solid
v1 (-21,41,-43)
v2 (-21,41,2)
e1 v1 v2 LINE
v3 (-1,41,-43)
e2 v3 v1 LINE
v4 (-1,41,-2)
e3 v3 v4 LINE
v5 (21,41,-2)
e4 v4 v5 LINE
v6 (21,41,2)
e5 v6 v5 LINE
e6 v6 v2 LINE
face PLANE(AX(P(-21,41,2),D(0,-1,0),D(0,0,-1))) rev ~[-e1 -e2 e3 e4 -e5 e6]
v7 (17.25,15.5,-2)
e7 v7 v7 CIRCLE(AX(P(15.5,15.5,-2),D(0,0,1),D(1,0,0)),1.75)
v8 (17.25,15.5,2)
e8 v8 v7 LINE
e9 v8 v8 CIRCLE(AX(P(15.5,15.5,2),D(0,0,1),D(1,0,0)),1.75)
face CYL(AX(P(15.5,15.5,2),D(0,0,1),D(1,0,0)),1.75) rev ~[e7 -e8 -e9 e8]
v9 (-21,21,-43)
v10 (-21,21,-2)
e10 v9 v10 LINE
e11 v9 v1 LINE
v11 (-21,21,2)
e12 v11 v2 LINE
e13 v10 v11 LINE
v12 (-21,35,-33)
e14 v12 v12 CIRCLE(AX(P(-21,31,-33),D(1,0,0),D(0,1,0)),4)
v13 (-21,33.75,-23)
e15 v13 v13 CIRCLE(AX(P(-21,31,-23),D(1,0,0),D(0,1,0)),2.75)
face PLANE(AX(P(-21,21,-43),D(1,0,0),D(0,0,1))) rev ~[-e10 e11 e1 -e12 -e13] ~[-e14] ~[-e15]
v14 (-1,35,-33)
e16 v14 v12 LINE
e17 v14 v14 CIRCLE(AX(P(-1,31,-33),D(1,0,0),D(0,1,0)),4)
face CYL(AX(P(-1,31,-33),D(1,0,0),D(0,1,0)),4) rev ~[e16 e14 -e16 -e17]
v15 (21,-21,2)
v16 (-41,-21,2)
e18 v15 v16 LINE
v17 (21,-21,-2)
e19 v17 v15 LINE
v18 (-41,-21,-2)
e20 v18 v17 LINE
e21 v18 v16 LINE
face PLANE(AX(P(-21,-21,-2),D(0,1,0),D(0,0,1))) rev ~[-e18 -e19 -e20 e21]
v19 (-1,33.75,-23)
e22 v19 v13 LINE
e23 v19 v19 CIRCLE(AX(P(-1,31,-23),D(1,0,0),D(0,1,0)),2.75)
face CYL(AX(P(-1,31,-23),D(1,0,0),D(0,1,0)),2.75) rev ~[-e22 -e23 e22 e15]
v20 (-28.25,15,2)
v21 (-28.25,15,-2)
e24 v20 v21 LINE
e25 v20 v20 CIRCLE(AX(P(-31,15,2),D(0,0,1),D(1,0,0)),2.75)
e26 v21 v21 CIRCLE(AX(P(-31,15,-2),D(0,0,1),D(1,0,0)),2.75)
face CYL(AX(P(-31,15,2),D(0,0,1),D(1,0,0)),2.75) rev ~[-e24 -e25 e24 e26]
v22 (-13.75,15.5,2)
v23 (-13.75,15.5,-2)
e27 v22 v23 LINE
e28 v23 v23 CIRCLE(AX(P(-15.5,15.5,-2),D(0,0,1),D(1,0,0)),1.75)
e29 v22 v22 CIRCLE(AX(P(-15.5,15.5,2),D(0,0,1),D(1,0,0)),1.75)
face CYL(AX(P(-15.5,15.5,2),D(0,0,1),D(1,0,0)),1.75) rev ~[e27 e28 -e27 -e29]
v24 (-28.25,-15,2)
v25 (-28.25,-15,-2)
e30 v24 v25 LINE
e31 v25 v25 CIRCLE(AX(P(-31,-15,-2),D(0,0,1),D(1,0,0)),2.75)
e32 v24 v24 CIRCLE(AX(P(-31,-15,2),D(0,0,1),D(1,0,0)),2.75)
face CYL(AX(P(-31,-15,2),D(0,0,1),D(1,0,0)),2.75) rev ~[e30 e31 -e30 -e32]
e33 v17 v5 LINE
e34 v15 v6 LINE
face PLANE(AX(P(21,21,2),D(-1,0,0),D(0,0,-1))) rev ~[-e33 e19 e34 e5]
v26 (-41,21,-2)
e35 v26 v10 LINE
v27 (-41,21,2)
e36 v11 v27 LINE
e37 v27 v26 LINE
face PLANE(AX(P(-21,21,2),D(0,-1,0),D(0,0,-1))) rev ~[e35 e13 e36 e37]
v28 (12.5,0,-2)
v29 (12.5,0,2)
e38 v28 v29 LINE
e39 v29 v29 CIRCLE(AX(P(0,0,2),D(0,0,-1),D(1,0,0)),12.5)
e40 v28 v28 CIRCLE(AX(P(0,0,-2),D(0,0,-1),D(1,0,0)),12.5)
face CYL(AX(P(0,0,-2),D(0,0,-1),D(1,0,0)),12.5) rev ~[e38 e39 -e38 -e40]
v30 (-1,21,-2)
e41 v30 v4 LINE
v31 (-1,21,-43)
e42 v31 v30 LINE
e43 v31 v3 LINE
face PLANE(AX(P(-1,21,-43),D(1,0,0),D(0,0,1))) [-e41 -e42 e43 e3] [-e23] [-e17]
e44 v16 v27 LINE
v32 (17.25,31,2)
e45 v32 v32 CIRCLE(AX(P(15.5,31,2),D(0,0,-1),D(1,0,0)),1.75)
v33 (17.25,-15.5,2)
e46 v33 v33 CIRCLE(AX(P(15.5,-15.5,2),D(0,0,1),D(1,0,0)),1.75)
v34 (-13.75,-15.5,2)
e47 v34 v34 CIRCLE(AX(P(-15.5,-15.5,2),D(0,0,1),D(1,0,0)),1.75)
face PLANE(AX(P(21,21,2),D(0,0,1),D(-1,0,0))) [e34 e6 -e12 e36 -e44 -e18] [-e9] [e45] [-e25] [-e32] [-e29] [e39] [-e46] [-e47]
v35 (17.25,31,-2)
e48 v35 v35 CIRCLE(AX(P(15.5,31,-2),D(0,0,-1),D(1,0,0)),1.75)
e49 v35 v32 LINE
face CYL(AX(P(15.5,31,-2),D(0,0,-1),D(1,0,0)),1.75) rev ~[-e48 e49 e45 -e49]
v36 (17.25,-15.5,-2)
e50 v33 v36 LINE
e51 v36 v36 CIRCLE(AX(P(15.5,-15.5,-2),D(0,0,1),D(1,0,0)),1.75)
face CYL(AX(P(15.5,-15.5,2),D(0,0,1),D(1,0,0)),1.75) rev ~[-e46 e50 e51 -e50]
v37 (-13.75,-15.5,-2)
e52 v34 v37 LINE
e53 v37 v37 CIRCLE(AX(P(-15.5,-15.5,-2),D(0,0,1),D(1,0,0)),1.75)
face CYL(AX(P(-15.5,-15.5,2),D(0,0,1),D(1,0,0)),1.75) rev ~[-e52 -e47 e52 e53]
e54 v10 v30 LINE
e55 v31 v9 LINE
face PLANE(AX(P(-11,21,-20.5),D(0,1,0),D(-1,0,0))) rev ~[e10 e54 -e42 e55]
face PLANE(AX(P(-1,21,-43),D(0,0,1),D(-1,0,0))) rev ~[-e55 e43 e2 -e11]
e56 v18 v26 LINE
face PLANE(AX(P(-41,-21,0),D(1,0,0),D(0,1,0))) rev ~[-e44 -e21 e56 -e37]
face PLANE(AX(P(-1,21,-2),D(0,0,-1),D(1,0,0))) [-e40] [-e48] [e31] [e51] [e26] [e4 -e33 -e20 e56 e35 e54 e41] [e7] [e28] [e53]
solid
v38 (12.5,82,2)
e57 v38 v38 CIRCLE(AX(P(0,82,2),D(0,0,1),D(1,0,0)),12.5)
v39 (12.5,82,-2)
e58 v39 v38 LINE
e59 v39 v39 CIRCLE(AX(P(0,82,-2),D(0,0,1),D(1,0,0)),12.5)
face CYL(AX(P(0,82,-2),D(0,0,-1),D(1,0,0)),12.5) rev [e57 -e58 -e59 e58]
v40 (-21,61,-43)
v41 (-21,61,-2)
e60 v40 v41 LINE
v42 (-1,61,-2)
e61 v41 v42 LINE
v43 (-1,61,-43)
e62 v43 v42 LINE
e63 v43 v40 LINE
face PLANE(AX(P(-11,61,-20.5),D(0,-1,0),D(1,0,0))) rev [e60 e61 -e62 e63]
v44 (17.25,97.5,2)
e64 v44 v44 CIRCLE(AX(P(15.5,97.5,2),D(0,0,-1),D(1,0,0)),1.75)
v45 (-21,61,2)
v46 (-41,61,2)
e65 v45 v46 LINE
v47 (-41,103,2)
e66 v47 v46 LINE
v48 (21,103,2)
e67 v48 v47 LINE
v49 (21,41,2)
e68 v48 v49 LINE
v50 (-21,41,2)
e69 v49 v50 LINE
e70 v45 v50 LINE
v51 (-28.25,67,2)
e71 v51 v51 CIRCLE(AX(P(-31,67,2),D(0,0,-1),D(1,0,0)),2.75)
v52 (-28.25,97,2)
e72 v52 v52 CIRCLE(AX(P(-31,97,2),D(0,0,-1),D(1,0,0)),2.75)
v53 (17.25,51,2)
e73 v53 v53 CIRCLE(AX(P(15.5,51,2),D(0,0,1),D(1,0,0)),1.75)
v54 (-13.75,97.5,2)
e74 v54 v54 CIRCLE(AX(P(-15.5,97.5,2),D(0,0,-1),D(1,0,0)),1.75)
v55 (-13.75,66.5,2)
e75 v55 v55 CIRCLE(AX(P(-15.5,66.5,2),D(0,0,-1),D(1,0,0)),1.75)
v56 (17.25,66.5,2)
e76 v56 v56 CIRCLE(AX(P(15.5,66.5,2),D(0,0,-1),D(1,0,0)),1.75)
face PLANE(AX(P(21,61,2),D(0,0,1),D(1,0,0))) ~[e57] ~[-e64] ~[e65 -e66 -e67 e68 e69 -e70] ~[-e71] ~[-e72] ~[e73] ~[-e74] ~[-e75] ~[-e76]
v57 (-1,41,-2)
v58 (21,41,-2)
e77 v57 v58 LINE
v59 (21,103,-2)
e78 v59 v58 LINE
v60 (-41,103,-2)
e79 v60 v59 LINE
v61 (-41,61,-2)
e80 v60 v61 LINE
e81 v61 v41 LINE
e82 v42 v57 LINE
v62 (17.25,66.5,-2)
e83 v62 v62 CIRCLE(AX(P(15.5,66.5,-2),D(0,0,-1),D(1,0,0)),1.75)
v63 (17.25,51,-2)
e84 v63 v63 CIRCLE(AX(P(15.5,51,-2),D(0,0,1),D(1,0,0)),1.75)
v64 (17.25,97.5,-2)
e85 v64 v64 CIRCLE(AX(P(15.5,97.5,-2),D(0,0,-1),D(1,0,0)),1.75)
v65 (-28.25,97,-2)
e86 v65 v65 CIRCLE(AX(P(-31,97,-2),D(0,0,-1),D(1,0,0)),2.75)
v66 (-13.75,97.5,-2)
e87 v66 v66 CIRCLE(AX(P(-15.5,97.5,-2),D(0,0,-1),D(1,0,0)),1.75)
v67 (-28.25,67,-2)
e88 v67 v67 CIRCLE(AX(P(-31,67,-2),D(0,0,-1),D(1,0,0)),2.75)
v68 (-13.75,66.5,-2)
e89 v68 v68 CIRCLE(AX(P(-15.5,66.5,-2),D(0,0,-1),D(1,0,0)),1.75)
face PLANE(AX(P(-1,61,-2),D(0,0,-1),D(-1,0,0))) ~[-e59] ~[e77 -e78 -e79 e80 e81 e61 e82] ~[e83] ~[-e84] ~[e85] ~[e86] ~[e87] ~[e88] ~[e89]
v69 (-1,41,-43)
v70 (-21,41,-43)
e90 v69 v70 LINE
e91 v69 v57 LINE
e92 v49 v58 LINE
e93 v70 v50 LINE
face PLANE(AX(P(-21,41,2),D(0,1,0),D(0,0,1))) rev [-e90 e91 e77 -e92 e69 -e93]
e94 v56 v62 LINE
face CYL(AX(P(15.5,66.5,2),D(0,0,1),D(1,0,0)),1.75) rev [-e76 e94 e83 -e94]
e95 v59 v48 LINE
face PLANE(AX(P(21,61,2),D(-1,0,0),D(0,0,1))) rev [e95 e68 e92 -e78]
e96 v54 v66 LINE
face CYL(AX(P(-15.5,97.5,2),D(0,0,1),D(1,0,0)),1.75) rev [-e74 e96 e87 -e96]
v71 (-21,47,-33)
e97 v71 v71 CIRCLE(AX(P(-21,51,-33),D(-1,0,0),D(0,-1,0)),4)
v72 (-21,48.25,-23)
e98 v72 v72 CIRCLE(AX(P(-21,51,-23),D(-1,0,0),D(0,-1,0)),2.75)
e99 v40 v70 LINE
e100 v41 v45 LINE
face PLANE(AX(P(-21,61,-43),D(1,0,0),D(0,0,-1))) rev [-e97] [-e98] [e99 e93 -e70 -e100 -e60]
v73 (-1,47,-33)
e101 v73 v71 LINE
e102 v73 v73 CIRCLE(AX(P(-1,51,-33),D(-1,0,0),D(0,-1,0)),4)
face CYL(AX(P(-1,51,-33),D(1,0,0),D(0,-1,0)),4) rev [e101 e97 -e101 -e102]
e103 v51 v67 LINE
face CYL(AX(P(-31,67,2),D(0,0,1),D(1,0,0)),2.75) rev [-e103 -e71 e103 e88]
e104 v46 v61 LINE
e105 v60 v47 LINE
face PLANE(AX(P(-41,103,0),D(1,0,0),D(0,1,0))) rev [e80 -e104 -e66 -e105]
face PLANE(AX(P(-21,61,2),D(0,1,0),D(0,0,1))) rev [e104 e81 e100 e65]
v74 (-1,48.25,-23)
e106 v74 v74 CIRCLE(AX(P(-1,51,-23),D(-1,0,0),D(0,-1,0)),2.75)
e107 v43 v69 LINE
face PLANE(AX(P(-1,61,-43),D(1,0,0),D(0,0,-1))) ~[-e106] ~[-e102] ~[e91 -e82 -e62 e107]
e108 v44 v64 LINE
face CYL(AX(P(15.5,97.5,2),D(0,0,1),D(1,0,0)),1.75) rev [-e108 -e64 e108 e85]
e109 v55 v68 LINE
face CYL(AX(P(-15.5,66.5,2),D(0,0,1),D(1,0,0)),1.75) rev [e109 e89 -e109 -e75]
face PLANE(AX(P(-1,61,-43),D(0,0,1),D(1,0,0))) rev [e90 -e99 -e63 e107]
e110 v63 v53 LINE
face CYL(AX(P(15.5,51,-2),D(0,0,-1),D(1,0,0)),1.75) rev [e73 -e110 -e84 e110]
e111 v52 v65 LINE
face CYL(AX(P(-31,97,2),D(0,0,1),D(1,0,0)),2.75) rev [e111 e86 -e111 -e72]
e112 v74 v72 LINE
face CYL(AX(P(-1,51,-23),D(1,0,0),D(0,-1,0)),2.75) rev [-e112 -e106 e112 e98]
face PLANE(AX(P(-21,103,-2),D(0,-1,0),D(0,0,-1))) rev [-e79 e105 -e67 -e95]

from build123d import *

# Parameters (mm, degrees)
F0_W      = 42
F0_H      = 42
F1_DEPTH  = 2
F2_R      = 1.75
F3_DEPTH  = 4.001
F4_DEPTH  = 20
F5_R      = 2.75
F6_DEPTH  = 4.001
F7_W      = 20
F7_H      = 45
F8_DEPTH  = 20
F9_DEPTH  = 20
F10_R     = 4
F10_R_2   = 2.75
F11_DEPTH = 40.001
F12_R     = 1.75
F13_DEPTH = 4.001
F14_R     = 12.5
F15_DEPTH = 4.001


with BuildPart() as f1:
    # F0 (on Top) → F1 (new body, symmetric)
    with BuildSketch(Plane.XY):
        Rectangle(F0_W, F0_H)
    extrude(amount=F1_DEPTH, both=True)

    # F2 (on face) → F3 (cut, through all)
    with BuildSketch(Plane.XY.offset(2)):
        with Locations((-15.5, 15.5)):
            Circle(F2_R)
        with Locations((15.5, 15.5)):
            Circle(F2_R)
        with Locations((-15.5, -15.5)):
            Circle(F2_R)
        with Locations((15.5, -15.5)):
            Circle(F2_R)
    extrude(amount=-F3_DEPTH, mode=Mode.SUBTRACT)

    # F4 (add): a face of the model
    f4_faces = [f1.faces().sort_by_distance(p)[0] for p in [
        (-21, 0, 0),
    ]]
    extrude(f4_faces, amount=F4_DEPTH)

    # F5 (on face) → F6 (cut, through all)
    with BuildSketch(Plane.XY.offset(2)):
        with Locations((-31, 15)):
            Circle(F5_R)
        with Locations((-31, -15)):
            Circle(F5_R)
    extrude(amount=-F6_DEPTH, mode=Mode.SUBTRACT)

    # F7 (on face) → F8 (join)
    with BuildSketch(Plane(origin=(0, 21, 0), x_dir=(-1, 0, 0), z_dir=(0, 1, 0))):
        with Locations((11, -20.5)):
            Rectangle(F7_W, F7_H)
    extrude(amount=F8_DEPTH)

    # F9 (add, through all): a face of the model
    f9_faces = [f1.faces().sort_by_distance(p)[0] for p in [
        (10, 21, 0),
    ]]
    extrude(f9_faces, amount=F9_DEPTH)

    # F10 (on face) → F11 (cut, through all)
    with BuildSketch(Plane.YZ.offset(-1)):
        with Locations((31, -33)):
            Circle(F10_R)
        with Locations((31, -23)):
            Circle(F10_R_2)
    extrude(amount=-F11_DEPTH, mode=Mode.SUBTRACT)

    # F12 (on face) → F13 (cut, through all)
    with BuildSketch(Plane(origin=(0, 0, -2), x_dir=(1, 0, 0), z_dir=(0, 0, -1))):
        with Locations((15.5, -31.0000000004)):
            Circle(F12_R)
    extrude(amount=-F13_DEPTH, mode=Mode.SUBTRACT)

    # F14 (on face) → F15 (cut, through all)
    with BuildSketch(Plane(origin=(0, 0, -2), x_dir=(1, 0, 0), z_dir=(0, 0, -1))):
        Circle(F14_R)
    extrude(amount=-F15_DEPTH, mode=Mode.SUBTRACT)


with BuildPart() as f16_1:
    # F16: instance of F1
    add(f1.part.mirror(Plane(origin=(-9.1295546559, 41, -18.6740890688), x_dir=(-1, 0, 0), z_dir=(0, 1, 0))))


solid = Compound([f1.part, f16_1.part])
